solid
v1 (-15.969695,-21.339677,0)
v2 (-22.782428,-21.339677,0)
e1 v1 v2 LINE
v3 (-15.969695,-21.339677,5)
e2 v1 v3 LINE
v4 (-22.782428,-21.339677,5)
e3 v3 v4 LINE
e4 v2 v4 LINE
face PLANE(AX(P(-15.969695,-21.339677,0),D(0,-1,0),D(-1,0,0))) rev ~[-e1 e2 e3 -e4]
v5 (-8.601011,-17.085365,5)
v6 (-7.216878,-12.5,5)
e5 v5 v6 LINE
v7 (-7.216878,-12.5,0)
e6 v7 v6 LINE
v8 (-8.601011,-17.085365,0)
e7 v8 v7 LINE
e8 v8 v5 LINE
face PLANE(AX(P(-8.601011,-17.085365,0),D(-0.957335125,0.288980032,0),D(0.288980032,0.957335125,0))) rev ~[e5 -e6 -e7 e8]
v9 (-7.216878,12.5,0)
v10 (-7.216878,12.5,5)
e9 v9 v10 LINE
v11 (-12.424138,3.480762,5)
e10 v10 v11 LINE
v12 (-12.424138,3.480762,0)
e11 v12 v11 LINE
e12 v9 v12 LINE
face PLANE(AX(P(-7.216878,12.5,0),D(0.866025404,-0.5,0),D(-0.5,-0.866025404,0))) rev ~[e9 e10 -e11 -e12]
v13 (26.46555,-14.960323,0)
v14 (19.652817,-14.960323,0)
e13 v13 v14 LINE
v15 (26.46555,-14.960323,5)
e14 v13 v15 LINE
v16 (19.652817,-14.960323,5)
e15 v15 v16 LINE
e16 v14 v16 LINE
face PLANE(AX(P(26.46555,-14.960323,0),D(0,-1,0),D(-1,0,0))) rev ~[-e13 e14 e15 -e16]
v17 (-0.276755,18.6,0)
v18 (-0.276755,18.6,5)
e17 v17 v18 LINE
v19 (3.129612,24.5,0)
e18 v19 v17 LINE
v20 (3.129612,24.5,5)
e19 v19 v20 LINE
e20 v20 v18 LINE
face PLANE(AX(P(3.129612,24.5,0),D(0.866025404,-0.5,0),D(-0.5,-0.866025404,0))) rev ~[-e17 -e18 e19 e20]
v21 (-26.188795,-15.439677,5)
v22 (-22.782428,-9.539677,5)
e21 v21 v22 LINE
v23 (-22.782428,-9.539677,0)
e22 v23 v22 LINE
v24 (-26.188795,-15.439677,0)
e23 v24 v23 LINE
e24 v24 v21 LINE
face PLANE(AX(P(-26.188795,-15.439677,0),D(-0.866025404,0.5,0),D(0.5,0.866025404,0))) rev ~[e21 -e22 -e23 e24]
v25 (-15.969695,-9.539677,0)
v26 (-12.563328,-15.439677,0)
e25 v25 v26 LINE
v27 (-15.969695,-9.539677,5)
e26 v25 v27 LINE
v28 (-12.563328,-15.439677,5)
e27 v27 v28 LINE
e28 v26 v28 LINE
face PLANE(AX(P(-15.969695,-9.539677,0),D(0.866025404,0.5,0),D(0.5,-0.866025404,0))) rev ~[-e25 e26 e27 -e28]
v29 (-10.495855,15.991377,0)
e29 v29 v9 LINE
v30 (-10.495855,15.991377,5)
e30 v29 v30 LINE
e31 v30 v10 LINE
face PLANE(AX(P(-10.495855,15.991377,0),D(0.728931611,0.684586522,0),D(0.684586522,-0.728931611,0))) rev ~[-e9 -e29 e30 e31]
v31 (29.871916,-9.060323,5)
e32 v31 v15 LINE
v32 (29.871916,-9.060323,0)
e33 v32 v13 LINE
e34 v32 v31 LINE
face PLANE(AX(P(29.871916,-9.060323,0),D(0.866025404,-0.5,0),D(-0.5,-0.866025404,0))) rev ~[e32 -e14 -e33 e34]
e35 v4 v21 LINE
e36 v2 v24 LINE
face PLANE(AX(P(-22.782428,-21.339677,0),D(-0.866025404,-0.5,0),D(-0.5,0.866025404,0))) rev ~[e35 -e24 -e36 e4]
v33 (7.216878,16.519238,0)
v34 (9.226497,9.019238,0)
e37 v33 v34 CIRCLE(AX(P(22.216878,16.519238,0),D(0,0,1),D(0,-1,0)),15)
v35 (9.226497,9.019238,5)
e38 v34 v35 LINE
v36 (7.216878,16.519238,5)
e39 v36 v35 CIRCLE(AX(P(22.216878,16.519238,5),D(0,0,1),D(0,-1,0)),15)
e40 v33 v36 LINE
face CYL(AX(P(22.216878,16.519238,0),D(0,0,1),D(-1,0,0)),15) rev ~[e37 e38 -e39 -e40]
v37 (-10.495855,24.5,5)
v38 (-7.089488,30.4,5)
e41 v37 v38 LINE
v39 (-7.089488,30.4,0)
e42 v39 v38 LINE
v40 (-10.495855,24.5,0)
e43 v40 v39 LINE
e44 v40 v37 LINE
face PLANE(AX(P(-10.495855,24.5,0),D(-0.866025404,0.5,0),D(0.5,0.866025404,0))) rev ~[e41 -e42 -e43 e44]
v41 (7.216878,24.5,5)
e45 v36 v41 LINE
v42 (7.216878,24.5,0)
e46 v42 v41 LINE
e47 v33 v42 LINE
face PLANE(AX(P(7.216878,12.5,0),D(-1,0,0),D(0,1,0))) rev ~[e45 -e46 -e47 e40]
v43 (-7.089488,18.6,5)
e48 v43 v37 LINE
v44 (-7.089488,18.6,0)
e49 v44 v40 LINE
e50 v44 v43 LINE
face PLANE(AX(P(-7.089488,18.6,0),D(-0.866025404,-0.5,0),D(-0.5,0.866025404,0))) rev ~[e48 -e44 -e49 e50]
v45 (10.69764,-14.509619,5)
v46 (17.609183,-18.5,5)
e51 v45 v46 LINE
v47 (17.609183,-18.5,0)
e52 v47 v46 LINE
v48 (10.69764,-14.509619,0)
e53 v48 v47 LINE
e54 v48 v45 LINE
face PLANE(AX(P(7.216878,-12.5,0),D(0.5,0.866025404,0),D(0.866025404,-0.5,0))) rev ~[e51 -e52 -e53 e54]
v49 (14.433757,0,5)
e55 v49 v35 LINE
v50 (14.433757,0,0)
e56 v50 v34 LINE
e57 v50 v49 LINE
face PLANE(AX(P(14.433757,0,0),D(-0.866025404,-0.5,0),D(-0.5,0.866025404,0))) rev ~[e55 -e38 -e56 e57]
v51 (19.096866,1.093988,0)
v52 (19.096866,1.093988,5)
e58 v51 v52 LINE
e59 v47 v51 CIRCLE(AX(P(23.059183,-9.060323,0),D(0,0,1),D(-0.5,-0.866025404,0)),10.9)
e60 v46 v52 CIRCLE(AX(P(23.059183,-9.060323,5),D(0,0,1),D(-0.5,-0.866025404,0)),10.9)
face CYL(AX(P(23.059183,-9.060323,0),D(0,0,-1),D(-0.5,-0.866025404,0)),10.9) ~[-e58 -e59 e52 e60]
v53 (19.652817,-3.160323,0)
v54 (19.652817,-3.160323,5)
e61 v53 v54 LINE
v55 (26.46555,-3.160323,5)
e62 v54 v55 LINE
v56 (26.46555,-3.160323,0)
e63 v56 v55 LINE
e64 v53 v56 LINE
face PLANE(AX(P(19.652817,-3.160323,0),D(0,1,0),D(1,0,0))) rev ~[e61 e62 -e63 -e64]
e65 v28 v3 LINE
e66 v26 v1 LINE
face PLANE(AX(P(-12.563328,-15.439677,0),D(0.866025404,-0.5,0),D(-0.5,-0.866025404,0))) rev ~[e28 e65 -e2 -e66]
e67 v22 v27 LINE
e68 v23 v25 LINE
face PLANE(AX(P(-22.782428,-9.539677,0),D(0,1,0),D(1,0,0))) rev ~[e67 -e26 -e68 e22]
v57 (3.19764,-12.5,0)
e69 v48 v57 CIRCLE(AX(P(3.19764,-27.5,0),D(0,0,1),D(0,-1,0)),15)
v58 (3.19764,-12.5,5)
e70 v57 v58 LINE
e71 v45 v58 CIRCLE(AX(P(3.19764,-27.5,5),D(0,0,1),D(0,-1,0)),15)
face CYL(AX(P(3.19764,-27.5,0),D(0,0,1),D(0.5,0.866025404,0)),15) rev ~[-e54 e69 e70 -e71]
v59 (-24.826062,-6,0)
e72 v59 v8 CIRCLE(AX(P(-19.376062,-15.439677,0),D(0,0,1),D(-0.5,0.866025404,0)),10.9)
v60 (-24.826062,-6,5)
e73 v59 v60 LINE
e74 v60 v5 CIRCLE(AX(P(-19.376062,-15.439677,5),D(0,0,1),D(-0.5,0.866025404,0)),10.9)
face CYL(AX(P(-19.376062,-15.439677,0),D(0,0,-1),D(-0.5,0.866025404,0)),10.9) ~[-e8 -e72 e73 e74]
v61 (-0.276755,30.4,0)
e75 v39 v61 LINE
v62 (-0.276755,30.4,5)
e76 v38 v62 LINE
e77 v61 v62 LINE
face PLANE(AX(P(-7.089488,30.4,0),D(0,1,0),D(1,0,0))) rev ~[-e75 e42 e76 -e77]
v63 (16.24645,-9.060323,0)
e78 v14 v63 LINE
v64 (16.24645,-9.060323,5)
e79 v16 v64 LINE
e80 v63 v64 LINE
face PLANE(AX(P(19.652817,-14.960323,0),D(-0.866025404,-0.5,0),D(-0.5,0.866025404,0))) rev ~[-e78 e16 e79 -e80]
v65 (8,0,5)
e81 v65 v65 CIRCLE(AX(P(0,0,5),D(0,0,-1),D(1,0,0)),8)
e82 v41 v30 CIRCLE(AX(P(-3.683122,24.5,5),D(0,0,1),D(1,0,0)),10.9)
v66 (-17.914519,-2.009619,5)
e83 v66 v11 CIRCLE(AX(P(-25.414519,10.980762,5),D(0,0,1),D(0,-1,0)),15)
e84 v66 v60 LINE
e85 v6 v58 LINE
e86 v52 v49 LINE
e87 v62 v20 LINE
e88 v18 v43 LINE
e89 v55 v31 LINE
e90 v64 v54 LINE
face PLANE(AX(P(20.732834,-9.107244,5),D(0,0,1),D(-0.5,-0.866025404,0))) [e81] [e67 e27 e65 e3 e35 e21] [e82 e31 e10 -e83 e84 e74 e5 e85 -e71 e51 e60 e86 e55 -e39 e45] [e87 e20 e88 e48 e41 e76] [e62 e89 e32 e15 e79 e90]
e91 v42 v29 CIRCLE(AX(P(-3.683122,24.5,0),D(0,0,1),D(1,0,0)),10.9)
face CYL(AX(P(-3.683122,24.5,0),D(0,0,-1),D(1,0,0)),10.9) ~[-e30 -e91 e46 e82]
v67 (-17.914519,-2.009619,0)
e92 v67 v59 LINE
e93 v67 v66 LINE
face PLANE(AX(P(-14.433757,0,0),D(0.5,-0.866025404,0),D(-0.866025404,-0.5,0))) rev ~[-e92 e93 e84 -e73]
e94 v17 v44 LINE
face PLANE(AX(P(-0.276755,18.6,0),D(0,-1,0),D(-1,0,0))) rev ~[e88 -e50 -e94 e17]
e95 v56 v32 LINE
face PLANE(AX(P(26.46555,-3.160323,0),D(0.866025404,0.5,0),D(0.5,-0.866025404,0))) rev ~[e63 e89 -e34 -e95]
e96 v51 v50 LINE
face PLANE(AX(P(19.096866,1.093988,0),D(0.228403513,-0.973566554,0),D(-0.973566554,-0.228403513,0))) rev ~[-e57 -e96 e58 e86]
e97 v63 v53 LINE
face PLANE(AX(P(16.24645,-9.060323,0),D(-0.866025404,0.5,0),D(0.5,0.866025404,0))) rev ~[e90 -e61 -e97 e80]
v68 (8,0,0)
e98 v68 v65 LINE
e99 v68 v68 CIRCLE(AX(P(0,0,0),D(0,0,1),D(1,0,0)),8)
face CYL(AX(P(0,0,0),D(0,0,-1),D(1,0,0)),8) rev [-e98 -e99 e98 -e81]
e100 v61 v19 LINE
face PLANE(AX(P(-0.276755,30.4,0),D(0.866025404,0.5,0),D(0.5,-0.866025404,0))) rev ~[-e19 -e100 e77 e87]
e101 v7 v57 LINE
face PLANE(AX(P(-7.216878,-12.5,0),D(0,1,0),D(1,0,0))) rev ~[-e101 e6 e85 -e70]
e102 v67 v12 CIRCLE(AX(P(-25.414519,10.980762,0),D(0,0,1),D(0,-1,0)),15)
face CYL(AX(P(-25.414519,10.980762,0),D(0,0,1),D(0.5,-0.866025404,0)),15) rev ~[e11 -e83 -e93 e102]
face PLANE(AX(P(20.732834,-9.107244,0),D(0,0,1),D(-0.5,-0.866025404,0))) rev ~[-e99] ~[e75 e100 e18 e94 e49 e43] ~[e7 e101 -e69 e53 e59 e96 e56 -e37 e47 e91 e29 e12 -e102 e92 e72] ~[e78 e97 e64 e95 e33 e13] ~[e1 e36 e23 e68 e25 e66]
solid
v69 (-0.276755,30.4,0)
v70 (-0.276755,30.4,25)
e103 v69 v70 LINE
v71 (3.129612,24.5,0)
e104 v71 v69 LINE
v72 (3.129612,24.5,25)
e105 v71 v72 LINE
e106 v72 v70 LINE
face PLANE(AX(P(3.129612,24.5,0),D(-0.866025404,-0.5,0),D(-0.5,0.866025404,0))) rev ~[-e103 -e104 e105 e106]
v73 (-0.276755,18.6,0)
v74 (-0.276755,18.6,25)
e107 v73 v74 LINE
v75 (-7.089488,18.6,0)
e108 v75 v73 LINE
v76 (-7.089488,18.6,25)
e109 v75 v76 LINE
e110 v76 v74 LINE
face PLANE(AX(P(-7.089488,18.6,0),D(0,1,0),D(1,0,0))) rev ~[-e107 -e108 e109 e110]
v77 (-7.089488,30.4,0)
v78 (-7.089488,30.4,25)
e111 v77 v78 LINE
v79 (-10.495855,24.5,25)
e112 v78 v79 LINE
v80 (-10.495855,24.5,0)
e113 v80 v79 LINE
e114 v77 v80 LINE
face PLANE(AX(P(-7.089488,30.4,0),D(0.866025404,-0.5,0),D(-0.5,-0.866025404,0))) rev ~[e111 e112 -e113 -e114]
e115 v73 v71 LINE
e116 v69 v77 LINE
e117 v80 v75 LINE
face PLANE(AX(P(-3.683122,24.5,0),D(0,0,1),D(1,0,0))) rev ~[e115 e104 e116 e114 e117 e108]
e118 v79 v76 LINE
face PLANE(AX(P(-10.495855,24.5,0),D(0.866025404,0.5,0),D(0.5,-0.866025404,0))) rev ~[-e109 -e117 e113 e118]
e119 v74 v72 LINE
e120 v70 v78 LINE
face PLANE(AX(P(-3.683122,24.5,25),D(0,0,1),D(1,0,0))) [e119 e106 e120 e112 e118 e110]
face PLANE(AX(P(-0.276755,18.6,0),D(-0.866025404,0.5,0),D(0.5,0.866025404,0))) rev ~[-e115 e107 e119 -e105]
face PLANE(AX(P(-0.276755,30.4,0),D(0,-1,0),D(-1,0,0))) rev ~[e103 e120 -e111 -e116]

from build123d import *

# Parameters (mm, degrees)
F0_R     = 8
F1_DEPTH = 5
F2_DEPTH = 5
F3_COUNT = 3
F4_DEPTH = 25
F5_R     = 15


# Not quite as in the source:
# - a feature names something its author has since deleted; it is built from what else it names


with BuildPart() as f1:
    # F0 (on Top) → F1 (new body)
    with BuildSketch(Plane.XY):
        Polygon((7.2168783649, 12.5), (-7.2168783649, 12.5), (-14.4337567297, 0), (-7.2168783649, -12.5), (7.2168783649, -12.5), (14.4337567297, 0), align=None)
        Circle(F0_R, mode=Mode.SUBTRACT)
    extrude(amount=F1_DEPTH)

    # F0 (on Top) → F2 (join)
    with BuildSketch(Plane.XY):
        with BuildLine():
            Line((-10.4958548116, 15.991376923), (-7.2168783649, 12.5))
            Line((-7.2168783649, 12.5), (7.2168783649, 12.5))
            Line((7.2168783649, 12.5), (7.2168783649, 24.5))
            ThreePointArc((7.2168783649, 24.5), (-8.4028254594, 34.3251918969), (-10.4958548116, 15.991376923))
        make_face()
        Polygon((-10.4958548116, 24.5), (-7.0894882233, 30.4), (-0.2767550469, 30.4), (3.1296115413, 24.5), (-0.2767550469, 18.6), (-7.0894882233, 18.6), align=None, mode=Mode.SUBTRACT)
    extrude(amount=F2_DEPTH)

    # F3: F1 ×3 about axis
    f3_axis = Axis((0, 0, 0), (0, 0, 1))


with BuildPart() as f1_1:
    add(f1.part)
    for i in range(1, F3_COUNT):
        add(f1.part.rotate(f3_axis, i * 360 / F3_COUNT))

    # F5
    f5_edges = [f1_1.edges().sort_by_distance(p)[0] for p in [
        (7.216878, 12.5, 2.5),
        (7.216878, -12.5, 2.5),
        (-14.433757, 0, 2.5),
    ]]
    fillet(f5_edges, radius=F5_R)


with BuildPart() as f4:
    # F0 (on Top) → F4 (new body)
    with BuildSketch(Plane.XY):
        Polygon((-0.2767550469, 30.4), (-7.0894882233, 30.4), (-10.4958548116, 24.5), (-7.0894882233, 18.6), (-0.2767550469, 18.6), (3.1296115413, 24.5), align=None)
    extrude(amount=F4_DEPTH)


solid = Compound([f1_1.part, f4.part])
